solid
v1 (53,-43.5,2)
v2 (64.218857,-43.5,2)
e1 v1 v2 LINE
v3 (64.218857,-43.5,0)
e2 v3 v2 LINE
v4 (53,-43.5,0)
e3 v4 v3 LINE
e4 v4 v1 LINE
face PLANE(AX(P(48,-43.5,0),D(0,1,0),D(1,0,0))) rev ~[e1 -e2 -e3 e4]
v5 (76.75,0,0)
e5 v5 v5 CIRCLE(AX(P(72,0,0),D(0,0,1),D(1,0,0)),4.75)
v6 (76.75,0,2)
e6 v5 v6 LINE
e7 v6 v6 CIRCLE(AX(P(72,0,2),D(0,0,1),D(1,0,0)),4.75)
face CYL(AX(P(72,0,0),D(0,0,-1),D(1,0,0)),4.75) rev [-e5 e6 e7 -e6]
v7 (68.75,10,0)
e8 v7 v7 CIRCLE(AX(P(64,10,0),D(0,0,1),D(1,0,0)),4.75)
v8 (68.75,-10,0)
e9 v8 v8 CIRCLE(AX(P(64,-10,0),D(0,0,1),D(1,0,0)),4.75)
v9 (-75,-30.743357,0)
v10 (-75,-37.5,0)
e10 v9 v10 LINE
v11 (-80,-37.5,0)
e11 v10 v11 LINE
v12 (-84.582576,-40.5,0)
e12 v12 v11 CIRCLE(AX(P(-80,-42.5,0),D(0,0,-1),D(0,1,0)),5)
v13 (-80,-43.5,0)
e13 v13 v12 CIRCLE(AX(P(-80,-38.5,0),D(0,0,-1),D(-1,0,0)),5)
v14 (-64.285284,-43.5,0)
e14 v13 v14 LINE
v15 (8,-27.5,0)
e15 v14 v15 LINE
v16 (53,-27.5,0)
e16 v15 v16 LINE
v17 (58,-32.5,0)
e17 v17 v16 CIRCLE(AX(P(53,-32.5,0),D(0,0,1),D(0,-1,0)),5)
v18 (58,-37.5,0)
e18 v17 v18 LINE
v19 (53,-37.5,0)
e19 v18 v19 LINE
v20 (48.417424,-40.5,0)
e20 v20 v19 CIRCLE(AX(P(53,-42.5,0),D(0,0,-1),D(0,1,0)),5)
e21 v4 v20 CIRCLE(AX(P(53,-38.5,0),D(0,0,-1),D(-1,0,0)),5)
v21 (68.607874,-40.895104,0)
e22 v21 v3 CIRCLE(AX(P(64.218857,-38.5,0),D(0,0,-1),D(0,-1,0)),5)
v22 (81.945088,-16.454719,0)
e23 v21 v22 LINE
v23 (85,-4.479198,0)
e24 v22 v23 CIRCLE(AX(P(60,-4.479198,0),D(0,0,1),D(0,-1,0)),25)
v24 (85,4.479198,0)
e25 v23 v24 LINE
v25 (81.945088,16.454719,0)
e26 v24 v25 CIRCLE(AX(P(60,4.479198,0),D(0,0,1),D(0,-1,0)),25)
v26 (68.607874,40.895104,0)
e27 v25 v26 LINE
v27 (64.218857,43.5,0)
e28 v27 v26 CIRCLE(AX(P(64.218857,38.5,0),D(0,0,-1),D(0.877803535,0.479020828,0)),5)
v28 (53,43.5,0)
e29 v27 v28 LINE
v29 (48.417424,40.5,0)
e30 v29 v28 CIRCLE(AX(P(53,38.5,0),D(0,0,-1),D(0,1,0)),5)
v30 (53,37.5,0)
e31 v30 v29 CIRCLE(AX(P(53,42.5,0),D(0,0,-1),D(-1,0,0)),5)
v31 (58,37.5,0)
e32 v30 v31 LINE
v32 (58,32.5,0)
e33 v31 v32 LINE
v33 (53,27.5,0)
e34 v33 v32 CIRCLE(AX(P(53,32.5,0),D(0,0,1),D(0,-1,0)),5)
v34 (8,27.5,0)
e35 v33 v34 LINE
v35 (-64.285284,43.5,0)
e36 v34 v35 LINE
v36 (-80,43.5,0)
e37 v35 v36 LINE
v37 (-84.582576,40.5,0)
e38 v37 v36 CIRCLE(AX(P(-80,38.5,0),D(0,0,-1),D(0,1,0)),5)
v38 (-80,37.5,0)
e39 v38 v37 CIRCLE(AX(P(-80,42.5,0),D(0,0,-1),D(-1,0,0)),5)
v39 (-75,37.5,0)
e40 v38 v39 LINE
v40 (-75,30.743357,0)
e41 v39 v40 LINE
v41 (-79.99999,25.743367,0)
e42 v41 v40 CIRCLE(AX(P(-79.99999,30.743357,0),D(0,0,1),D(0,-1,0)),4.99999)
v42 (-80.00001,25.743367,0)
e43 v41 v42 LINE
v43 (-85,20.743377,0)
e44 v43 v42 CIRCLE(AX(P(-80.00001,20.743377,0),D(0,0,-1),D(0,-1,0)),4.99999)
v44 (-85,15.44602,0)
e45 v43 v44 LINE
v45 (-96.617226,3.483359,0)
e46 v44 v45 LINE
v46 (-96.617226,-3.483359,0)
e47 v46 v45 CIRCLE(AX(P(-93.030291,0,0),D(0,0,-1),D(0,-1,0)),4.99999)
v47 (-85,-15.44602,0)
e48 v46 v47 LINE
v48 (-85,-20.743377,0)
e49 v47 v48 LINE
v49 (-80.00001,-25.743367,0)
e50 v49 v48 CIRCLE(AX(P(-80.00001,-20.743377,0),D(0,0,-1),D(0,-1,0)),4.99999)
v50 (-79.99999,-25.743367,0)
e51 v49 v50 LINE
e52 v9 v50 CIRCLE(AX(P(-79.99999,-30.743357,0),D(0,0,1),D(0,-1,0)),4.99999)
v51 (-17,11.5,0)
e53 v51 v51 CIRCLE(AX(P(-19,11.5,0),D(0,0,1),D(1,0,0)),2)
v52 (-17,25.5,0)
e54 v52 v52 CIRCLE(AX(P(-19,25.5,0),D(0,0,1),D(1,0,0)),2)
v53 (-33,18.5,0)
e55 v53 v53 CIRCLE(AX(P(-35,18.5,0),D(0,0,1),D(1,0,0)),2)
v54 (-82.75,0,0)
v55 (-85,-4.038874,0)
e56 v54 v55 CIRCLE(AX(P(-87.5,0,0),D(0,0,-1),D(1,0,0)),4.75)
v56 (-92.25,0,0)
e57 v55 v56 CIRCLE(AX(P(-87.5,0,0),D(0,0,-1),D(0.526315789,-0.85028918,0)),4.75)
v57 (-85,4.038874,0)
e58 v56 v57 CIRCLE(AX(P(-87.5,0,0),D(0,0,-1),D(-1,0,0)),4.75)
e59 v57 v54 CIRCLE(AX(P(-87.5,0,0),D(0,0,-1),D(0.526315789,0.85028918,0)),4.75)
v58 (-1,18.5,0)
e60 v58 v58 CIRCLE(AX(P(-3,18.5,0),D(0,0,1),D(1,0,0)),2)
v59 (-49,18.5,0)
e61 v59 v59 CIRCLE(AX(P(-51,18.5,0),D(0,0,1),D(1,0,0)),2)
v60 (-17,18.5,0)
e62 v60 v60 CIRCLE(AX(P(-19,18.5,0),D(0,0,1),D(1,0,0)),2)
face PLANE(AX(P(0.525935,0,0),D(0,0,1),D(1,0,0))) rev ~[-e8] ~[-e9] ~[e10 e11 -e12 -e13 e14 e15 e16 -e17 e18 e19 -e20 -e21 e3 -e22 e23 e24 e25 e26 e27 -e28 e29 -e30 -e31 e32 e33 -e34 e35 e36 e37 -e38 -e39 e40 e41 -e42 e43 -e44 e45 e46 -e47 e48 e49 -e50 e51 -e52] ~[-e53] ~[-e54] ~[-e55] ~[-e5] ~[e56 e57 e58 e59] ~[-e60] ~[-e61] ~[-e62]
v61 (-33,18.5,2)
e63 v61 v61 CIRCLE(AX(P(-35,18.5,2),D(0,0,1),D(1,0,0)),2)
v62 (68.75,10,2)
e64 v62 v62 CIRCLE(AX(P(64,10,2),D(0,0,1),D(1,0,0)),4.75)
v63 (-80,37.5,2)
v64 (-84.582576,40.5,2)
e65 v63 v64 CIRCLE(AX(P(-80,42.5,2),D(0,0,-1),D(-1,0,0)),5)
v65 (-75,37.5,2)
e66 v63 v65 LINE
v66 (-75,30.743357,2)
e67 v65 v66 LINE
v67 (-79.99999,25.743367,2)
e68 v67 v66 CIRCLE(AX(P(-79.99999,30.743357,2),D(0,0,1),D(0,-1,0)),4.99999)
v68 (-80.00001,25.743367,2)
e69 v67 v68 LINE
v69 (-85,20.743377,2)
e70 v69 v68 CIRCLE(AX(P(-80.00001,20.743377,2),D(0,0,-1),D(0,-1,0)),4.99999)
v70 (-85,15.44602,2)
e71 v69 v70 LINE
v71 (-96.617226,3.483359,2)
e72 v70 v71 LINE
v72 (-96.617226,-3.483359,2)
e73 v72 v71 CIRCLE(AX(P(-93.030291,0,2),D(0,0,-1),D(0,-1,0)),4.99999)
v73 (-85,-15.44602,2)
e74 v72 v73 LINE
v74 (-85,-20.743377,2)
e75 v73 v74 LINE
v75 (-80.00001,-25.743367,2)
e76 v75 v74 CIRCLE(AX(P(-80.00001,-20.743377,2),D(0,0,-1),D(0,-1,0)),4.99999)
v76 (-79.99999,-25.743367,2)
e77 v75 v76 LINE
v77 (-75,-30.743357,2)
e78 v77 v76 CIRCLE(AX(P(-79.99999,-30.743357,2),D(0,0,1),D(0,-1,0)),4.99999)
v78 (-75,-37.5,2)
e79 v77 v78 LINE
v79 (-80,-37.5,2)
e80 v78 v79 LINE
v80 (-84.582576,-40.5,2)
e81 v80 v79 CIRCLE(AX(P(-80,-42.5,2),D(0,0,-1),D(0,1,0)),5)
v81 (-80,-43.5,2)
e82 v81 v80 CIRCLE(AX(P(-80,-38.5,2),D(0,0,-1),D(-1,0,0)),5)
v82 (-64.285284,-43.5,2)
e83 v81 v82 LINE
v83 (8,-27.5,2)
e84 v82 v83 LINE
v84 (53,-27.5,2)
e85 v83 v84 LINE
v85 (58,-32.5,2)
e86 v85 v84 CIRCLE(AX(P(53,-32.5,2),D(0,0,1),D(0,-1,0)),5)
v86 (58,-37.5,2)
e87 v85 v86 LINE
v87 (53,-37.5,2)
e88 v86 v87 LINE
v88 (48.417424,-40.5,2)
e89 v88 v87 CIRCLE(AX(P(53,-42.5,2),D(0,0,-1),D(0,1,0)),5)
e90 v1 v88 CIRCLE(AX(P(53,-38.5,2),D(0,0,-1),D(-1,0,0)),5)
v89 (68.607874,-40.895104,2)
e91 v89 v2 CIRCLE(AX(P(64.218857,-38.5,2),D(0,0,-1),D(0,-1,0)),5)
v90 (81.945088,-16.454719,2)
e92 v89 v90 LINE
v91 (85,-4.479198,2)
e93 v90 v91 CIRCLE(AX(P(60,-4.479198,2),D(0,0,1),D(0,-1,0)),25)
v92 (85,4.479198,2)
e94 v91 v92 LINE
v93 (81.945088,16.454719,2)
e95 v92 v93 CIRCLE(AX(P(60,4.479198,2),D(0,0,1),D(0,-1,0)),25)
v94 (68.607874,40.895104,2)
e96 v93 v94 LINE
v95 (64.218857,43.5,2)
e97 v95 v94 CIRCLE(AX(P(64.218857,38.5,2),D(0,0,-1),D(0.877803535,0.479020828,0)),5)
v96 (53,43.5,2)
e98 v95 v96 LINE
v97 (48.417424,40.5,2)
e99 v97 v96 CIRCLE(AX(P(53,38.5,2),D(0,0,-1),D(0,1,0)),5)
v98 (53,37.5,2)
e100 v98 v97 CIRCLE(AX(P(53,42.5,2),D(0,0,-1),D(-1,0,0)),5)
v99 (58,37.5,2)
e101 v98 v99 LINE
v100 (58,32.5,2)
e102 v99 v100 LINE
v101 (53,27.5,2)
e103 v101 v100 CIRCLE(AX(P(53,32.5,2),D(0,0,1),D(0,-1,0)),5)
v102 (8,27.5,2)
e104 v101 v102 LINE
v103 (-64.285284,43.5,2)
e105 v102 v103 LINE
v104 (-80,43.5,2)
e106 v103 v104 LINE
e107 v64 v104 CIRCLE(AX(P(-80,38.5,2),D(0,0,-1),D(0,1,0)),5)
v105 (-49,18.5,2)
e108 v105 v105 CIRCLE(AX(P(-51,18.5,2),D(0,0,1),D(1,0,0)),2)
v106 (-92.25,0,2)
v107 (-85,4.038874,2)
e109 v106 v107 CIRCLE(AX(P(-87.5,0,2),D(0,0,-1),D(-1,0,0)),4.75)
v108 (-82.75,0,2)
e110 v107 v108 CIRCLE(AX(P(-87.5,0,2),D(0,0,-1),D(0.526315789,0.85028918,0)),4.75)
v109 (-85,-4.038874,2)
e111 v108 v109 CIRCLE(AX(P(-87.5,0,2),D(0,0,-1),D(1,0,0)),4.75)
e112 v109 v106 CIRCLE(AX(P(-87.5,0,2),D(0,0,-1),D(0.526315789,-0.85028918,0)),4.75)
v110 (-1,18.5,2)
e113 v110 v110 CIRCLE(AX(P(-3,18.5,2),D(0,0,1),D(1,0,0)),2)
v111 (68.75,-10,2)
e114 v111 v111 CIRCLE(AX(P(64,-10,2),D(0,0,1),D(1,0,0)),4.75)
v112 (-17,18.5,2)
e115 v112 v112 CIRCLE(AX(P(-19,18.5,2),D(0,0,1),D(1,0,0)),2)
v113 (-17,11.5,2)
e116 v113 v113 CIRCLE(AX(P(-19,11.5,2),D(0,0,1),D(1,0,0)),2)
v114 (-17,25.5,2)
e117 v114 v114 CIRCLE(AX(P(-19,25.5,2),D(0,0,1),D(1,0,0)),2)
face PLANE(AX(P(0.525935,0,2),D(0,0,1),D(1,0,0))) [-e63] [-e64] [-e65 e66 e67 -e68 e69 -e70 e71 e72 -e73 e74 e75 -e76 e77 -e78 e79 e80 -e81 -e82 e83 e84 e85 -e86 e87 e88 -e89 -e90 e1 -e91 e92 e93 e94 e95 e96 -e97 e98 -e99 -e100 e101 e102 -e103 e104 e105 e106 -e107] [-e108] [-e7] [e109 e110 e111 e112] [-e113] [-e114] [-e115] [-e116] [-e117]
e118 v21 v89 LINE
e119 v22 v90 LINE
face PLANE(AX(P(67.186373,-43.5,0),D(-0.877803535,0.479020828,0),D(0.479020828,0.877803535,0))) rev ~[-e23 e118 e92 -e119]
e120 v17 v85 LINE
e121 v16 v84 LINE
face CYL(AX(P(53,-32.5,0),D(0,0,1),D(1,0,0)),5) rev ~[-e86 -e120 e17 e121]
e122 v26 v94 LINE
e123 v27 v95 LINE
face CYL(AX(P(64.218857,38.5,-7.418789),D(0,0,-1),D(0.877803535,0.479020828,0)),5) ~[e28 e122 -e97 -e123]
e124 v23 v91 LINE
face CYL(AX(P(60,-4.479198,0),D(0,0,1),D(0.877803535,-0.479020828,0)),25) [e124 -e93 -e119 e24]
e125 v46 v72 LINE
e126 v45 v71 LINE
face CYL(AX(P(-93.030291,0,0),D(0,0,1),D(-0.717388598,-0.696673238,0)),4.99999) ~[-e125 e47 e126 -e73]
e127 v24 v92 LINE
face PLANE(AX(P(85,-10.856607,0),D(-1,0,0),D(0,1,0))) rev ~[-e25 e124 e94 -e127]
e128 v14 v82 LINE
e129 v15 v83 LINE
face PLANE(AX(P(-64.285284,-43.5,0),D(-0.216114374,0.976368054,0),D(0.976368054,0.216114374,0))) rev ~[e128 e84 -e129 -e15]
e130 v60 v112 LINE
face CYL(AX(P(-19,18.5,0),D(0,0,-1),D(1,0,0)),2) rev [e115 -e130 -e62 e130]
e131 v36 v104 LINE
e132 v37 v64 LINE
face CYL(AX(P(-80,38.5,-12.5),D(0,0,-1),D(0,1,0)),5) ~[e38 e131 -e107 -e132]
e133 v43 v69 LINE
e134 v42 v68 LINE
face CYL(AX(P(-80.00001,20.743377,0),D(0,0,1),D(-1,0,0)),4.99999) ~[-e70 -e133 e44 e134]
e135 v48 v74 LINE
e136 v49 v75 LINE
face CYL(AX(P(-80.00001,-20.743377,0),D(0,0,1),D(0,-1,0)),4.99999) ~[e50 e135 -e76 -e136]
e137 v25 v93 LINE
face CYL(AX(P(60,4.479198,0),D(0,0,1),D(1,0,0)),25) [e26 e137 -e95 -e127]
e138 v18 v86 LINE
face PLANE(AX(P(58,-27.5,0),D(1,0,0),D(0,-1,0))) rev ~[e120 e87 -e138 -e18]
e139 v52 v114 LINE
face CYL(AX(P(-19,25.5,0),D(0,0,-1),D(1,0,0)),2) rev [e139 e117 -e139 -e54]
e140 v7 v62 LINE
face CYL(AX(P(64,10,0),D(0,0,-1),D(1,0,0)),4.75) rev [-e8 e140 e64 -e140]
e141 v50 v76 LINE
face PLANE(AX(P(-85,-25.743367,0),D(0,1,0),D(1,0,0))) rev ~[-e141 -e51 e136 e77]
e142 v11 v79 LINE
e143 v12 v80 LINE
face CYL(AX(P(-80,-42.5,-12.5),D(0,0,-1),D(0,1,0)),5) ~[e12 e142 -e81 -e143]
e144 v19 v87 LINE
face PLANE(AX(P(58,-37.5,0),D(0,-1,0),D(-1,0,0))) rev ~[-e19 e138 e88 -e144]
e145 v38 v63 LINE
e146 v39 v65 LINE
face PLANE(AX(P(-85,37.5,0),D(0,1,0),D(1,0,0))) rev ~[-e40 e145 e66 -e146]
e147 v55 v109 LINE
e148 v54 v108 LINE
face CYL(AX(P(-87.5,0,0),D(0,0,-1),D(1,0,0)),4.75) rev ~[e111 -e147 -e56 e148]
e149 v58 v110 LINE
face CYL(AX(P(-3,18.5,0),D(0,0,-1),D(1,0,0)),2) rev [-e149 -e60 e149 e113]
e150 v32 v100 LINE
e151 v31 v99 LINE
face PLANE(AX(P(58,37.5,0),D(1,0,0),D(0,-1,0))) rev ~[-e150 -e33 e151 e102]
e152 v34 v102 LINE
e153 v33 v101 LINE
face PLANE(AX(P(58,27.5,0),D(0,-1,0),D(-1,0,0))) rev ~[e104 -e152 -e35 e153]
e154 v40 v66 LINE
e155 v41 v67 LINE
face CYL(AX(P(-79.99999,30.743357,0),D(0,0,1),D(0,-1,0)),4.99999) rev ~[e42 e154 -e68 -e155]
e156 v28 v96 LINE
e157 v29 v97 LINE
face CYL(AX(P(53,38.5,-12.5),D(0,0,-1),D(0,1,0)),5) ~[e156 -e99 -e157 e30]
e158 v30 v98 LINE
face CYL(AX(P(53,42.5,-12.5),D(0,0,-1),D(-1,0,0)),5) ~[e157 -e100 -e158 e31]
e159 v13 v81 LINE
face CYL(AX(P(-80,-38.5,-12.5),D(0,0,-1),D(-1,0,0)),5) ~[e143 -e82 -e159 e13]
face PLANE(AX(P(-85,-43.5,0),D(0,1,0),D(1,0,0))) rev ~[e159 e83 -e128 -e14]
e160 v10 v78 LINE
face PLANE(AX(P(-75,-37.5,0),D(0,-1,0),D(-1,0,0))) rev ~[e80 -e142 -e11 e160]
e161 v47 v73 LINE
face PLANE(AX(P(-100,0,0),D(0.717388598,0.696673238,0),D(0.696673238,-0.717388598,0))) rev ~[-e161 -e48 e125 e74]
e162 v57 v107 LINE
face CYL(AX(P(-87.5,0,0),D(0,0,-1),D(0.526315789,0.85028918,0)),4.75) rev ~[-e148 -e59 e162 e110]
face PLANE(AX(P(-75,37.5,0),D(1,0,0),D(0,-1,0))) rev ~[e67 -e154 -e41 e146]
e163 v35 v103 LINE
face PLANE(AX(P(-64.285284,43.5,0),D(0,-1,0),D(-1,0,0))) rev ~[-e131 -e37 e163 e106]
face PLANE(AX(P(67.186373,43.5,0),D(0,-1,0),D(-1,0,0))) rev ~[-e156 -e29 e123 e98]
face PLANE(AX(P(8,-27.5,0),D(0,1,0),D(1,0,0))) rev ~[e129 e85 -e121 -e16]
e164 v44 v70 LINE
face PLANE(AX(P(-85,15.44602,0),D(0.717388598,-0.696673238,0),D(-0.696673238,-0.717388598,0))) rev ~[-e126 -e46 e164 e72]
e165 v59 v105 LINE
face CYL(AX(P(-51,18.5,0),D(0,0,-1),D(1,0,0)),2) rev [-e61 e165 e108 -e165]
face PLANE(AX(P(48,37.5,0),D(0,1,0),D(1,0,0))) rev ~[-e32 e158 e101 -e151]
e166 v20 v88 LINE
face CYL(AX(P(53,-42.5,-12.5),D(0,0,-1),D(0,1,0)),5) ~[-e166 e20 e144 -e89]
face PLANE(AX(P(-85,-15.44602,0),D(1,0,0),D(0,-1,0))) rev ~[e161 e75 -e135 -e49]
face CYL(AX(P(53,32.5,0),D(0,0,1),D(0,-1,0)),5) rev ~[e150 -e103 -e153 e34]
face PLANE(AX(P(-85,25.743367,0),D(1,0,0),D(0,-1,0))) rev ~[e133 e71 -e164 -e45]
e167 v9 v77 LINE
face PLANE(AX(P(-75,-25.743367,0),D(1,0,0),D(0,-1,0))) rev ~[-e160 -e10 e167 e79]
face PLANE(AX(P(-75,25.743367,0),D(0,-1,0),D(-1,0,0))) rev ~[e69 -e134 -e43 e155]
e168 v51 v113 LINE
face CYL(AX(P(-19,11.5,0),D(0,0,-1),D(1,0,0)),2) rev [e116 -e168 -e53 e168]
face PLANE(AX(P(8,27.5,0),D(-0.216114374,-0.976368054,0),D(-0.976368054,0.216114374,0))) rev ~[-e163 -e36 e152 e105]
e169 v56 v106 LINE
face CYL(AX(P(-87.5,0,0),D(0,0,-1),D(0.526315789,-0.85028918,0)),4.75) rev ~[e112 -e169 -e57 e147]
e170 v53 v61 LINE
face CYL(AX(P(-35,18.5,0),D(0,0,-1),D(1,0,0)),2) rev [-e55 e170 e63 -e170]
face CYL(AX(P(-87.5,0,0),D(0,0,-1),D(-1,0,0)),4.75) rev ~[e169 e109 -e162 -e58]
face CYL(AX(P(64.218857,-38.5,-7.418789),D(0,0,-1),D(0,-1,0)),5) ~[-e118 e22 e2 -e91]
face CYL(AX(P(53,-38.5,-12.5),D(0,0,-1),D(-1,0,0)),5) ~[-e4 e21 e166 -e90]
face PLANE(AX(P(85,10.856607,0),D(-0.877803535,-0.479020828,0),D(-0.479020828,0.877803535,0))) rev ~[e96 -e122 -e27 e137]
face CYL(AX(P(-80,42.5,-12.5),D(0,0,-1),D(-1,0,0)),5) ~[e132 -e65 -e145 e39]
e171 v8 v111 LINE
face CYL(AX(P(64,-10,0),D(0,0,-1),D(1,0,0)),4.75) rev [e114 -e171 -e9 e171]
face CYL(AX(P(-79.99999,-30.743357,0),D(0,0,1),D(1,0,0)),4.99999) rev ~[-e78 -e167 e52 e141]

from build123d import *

# Parameters (mm, degrees)
F0_R        = 4.75
F0_R_2      = 2
F1_DEPTH    = 2
F2_T1_DEPTH = 16.8375789978
F2_T3_DEPTH = 27
F3_R        = 5
F4_R        = 4.99999
F5_R        = 25


# Not quite as in the source:
# - a fillet or chamfer that OpenCascade refuses, or shapes differently, is made with other operations: its cross-section is extruded or revolved along the edge and cut away or added
# - a fillet or chamfer is up to 0.001 mm smaller than in the source, because OpenCascade refuses the exact size


with BuildPart() as f1:
    # F0 (on Top) → F1 (new body)
    with BuildSketch(Plane.XY):
        Polygon((48, -43.5), (67.1863725781, -43.5), (85, -10.8566070522), (85, 10.8566070522), (67.1863725781, 43.5), (48, 43.5), (48, 37.5), (58, 37.5), (58, 27.5), (8, 27.5), (-64.2852836847, 43.5), (-85, 43.5), (-85, 37.5), (-75, 37.5), (-75, 25.7433671504), (-75, 0), (-75, -25.7433671504), (-75, -37.5), (-85, -37.5), (-85, -43.5), (-64.2852836847, -43.5), (8, -27.5), (58, -27.5), (58, -37.5), (48, -37.5), align=None)
        with Locations((64, -10)):
            Circle(F0_R, mode=Mode.SUBTRACT)
        with Locations((-51, 18.5)):
            Circle(F0_R_2, mode=Mode.SUBTRACT)
        with Locations((-35, 18.5)):
            Circle(F0_R_2, mode=Mode.SUBTRACT)
        with Locations((-19, 11.5)):
            Circle(F0_R_2, mode=Mode.SUBTRACT)
        with Locations((-19, 18.5)):
            Circle(F0_R_2, mode=Mode.SUBTRACT)
        with Locations((-19, 25.5)):
            Circle(F0_R_2, mode=Mode.SUBTRACT)
        with Locations((-3, 18.5)):
            Circle(F0_R_2, mode=Mode.SUBTRACT)
        with Locations((72, 0)):
            Circle(F0_R, mode=Mode.SUBTRACT)
        with Locations((64, 10)):
            Circle(F0_R, mode=Mode.SUBTRACT)
        with BuildLine():
            Line((-82.75, 0), (-75, 0))
            Line((-75, 0), (-75, 25.7433671504))
            Line((-75, 25.7433671504), (-85, 15.4460202903))
            Line((-85, 15.4460202903), (-85, 4.0388736054))
            ThreePointArc((-85, 4.0388736054), (-83.3504518318, 2.3116552511), (-82.75, 0))
        make_face()
        with BuildLine():
            Line((-85, 15.4460202903), (-100, 0))
            Line((-100, 0), (-92.25, 0))
            ThreePointArc((-92.25, 0), (-89.8116552511, 4.1495481682), (-85, 4.0388736054))
            Line((-85, 4.0388736054), (-85, 15.4460202903))
        make_face()
        with BuildLine():
            Line((-85, -4.0388736054), (-85, -15.4460202903))
            Line((-85, -15.4460202903), (-75, -25.7433671504))
            Line((-75, -25.7433671504), (-75, 0))
            Line((-75, 0), (-82.75, 0))
            ThreePointArc((-82.75, 0), (-83.3504518318, -2.3116552511), (-85, -4.0388736054))
        make_face()
        with BuildLine():
            Line((-100, 0), (-85, -15.4460202903))
            Line((-85, -15.4460202903), (-85, -4.0388736054))
            ThreePointArc((-85, -4.0388736054), (-89.8116552511, -4.1495481682), (-92.25, 0))
            Line((-92.25, 0), (-100, 0))
        make_face()
        Polygon((-75, 25.7433671504), (-85, 25.7433671504), (-85, 15.4460202903), align=None)
        Polygon((-85, -15.4460202903), (-85, -25.7433671504), (-75, -25.7433671504), align=None)
    extrude(amount=F1_DEPTH)

    # F2: fillet of radius 5 on 10 edges, made by hand

    # F2_s2 → F2_t1 (cut)
    with BuildSketch(Plane.XY.offset(-7.4187894989)):
        with BuildLine():
            ThreePointArc((68.607874454, 40.8951041407), (66.7707657989, 42.7997395679), (64.2188567786, 43.5))
            Line((64.2188567786, 43.5), (67.1863725781, 43.5))
            Line((67.1863725781, 43.5), (68.607874454, 40.8951041407))
        make_face()
        with BuildLine():
            ThreePointArc((64.2188567786, -43.5), (66.7707657989, -42.7997395679), (68.607874454, -40.8951041407))
            Line((68.607874454, -40.8951041407), (67.1863725781, -43.5))
            Line((67.1863725781, -43.5), (64.2188567786, -43.5))
        make_face()
    extrude(amount=F2_T1_DEPTH, mode=Mode.SUBTRACT)

    # F2_s4 → F2_t3 (cut)
    with BuildSketch(Plane.XY.offset(-12.5)):
        with BuildLine():
            ThreePointArc((53, 43.5), (49.4644660941, 42.0355339059), (48, 38.5))
            Line((48, 38.5), (48, 43.5))
            Line((48, 43.5), (53, 43.5))
        make_face()
        with BuildLine():
            ThreePointArc((-85, -38.5), (-83.5355339059, -42.0355339059), (-80, -43.5))
            Line((-80, -43.5), (-85, -43.5))
            Line((-85, -43.5), (-85, -38.5))
        make_face()
        with BuildLine():
            ThreePointArc((-80, -37.5), (-83.5355339059, -38.9644660941), (-85, -42.5))
            Line((-85, -42.5), (-85, -37.5))
            Line((-85, -37.5), (-80, -37.5))
        make_face()
        with BuildLine():
            ThreePointArc((48, -38.5), (49.4644660941, -42.0355339059), (53, -43.5))
            Line((53, -43.5), (48, -43.5))
            Line((48, -43.5), (48, -38.5))
        make_face()
        with BuildLine():
            ThreePointArc((53, -37.5), (49.4644660941, -38.9644660941), (48, -42.5))
            Line((48, -42.5), (48, -37.5))
            Line((48, -37.5), (53, -37.5))
        make_face()
        with BuildLine():
            ThreePointArc((48, 42.5), (49.4644660941, 38.9644660941), (53, 37.5))
            Line((53, 37.5), (48, 37.5))
            Line((48, 37.5), (48, 42.5))
        make_face()
        with BuildLine():
            ThreePointArc((-85, 42.5), (-83.5355339059, 38.9644660941), (-80, 37.5))
            Line((-80, 37.5), (-85, 37.5))
            Line((-85, 37.5), (-85, 42.5))
        make_face()
        with BuildLine():
            ThreePointArc((-80, 43.5), (-83.5355339059, 42.0355339059), (-85, 38.5))
            Line((-85, 38.5), (-85, 43.5))
            Line((-85, 43.5), (-80, 43.5))
        make_face()
    extrude(amount=F2_T3_DEPTH, mode=Mode.SUBTRACT)

    # F3
    f3_edges = [f1.edges().sort_by_distance(p)[0] for p in [
        (58, -27.5, 1),
        (58, 27.5, 1),
    ]]
    fillet(f3_edges, radius=F3_R)

    # F4 (radius 5 in the source; OpenCascade refuses exactly that, so slightly less here)
    f4_edges = [f1.edges().sort_by_distance(p)[0] for p in [
        (-85, 25.743367, 1),
        (-85, -25.743367, 1),
        (-75, 25.743367, 1),
        (-75, -25.743367, 1),
        (-100, 0, 1),
    ]]
    fillet(f4_edges, radius=F4_R)

    # F5
    f5_edges = [f1.edges().sort_by_distance(p)[0] for p in [
        (85, -10.856607, 1),
        (85, 10.856607, 1),
    ]]
    fillet(f5_edges, radius=F5_R)


solid = f1.part
